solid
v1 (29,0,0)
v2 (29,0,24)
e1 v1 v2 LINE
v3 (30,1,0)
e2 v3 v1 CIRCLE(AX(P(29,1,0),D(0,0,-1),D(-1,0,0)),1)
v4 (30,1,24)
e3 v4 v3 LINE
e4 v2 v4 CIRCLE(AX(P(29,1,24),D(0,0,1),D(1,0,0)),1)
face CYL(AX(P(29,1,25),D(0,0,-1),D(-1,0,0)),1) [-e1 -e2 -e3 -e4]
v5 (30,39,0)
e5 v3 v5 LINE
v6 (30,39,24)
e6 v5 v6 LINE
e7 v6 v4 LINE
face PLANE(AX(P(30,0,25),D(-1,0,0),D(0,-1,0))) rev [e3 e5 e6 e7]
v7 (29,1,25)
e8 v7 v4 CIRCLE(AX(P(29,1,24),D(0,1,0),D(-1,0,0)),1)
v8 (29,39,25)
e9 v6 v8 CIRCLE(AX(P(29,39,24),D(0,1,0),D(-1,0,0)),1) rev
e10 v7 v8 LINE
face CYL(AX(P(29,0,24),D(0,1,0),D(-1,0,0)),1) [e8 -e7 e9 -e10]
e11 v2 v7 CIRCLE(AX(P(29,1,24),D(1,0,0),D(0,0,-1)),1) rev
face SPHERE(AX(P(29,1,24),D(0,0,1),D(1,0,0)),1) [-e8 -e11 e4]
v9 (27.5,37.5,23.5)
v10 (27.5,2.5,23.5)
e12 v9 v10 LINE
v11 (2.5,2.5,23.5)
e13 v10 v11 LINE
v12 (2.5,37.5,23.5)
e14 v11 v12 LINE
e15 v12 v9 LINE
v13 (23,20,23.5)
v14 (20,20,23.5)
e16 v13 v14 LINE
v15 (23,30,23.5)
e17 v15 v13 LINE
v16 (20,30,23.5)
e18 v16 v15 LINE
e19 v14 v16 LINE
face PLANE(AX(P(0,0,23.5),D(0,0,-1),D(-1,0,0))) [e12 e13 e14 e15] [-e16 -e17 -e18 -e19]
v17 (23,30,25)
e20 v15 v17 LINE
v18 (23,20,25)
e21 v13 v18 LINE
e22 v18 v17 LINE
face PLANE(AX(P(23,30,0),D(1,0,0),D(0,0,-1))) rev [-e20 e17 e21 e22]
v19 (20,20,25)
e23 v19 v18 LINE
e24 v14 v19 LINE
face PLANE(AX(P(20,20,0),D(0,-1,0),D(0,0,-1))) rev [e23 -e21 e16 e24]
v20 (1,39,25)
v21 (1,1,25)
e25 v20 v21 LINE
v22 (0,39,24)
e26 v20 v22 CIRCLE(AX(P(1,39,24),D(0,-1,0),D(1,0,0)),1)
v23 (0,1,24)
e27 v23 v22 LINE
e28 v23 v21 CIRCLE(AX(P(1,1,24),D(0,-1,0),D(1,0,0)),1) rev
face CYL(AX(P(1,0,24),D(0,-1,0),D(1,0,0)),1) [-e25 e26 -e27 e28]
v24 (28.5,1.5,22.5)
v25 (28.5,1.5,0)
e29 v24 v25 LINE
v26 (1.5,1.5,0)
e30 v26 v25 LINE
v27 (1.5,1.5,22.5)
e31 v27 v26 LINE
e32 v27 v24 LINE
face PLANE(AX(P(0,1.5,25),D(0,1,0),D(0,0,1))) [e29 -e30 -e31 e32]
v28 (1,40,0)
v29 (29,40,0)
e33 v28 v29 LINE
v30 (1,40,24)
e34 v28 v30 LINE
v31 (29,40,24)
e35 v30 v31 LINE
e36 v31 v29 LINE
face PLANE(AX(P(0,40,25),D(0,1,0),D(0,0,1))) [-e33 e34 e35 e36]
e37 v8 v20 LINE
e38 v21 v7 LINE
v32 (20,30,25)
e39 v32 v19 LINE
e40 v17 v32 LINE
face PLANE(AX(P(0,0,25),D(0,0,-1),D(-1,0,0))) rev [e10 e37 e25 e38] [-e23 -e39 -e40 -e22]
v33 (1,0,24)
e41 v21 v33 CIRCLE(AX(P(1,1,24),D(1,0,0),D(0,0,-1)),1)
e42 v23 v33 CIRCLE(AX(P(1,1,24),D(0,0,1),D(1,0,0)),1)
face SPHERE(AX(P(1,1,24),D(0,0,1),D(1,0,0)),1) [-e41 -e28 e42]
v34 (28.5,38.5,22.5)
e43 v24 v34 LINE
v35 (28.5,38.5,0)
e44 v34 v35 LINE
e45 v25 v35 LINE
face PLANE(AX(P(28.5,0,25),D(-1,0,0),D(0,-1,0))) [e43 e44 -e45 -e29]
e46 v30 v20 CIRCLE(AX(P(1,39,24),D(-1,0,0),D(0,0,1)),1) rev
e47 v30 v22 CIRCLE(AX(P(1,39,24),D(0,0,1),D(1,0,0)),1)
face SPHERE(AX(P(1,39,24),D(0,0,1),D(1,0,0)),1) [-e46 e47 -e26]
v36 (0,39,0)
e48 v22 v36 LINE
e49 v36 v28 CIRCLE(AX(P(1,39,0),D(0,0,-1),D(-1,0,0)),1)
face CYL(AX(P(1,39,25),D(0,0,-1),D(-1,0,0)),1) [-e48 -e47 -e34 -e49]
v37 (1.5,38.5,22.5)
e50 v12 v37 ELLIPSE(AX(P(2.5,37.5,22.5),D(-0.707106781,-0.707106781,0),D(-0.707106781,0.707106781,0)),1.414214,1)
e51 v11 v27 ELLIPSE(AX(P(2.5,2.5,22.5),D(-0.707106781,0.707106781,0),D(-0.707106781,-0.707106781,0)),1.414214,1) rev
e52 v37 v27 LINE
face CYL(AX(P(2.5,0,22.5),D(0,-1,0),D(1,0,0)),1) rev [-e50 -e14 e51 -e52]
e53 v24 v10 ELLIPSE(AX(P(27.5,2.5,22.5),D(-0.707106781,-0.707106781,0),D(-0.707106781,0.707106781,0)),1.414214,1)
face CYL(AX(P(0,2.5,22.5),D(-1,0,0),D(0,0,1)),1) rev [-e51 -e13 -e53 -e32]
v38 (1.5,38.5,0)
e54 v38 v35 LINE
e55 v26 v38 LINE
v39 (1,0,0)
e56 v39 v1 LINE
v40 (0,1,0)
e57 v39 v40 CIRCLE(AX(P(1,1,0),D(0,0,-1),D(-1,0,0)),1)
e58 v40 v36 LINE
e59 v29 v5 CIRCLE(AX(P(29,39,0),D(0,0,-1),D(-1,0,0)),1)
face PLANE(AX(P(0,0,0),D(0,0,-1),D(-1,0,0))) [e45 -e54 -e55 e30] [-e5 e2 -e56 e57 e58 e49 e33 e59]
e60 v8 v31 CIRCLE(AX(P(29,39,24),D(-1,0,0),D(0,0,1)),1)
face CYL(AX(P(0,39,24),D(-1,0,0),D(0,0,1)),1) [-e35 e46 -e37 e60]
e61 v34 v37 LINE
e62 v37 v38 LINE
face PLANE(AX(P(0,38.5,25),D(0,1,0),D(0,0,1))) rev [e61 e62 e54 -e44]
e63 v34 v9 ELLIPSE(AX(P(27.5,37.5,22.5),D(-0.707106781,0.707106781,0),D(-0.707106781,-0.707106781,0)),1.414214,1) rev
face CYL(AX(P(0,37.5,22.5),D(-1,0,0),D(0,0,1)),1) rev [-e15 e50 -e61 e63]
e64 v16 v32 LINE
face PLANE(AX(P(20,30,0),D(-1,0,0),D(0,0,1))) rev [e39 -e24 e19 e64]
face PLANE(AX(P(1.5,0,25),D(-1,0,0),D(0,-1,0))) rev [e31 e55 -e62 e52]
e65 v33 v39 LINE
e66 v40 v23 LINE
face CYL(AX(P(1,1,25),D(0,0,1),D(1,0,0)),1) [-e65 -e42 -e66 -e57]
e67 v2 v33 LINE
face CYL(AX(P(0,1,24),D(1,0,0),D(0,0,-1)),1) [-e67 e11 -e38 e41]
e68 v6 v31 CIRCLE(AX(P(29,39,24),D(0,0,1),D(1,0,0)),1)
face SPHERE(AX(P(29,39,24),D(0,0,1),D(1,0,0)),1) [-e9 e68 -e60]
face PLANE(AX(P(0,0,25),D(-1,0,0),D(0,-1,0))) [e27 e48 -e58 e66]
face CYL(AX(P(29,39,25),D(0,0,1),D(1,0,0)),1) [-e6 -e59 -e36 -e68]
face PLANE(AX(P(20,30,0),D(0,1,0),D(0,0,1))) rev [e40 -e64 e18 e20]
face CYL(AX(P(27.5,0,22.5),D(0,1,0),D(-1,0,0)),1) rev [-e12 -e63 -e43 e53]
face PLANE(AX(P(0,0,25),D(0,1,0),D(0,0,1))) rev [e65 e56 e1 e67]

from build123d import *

# Parameters (mm, degrees)
SKETCH2_W           = 30
SKETCH2_H           = 40
BOSS_EXTRUDE2_DEPTH = 25
FILLET2_R           = 1
FILLET3_R           = 1
SHELL1_START        = 1.5
SHELL1_OUTLINE_W    = 37
SHELL1_OUTLINE_H    = 23.5
SHELL1_DEPTH        = 27
FILLET4_R           = 1
SKETCH5_W           = 3
SKETCH5_H           = 10
CUT_EXTRUDE1_DEPTH  = 56.901699437


# Read off the part's stored shape, not the designer's step: Shell1
with BuildPart() as part:
    # Sketch2 → Boss-Extrude2 (new body)
    with BuildSketch(Plane.XY):
        with Locations((15, 20)):
            Rectangle(SKETCH2_W, SKETCH2_H)
    extrude(amount=BOSS_EXTRUDE2_DEPTH)

    # Fillet2
    fillet2_edges = [part.edges().sort_by_distance(p)[0] for p in [
        (30, 20, 25),
        (15, 0, 25),
        (0, 20, 25),
        (15, 40, 25),
    ]]
    fillet(fillet2_edges, radius=FILLET2_R)

    # Fillet3
    # the kernel refuses this fillet: 1 mm, written as the material it takes off along each edge
    with BuildSketch(Plane(origin=(1, 39, 24), x_dir=(0, 1, 0), z_dir=(-1, 0, 0))) as fillet3_piece_1_section:
        Polygon((0, 0), (FILLET3_R, 0), (FILLET3_R, -FILLET3_R), (0, -FILLET3_R), align=None)
    fillet3_piece_1 = extrude(amount=FILLET3_R, mode=Mode.PRIVATE)
    fillet3_piece_1 = fillet3_piece_1 - Plane(origin=(1, 39, 24), x_dir=(0, -0.7071067811865475, -0.7071067811865475), z_dir=(-1, 0, 0)) * Sphere(FILLET3_R, mode=Mode.PRIVATE)
    add(fillet3_piece_1, mode=Mode.SUBTRACT)
    with BuildSketch(Plane(origin=(29, 39, 24), x_dir=(0, 1, 0), z_dir=(1, 0, 0))) as fillet3_piece_2_section:
        Polygon((0, 0), (FILLET3_R, 0), (FILLET3_R, FILLET3_R), (0, FILLET3_R), align=None)
    fillet3_piece_2 = extrude(amount=FILLET3_R, mode=Mode.PRIVATE)
    fillet3_piece_2 = fillet3_piece_2 - Plane(origin=(29, 39, 24), x_dir=(0, -0.7071067811865475, -0.7071067811865475), z_dir=(1, 0, 0)) * Sphere(FILLET3_R, mode=Mode.PRIVATE)
    add(fillet3_piece_2, mode=Mode.SUBTRACT)
    with BuildSketch(Plane(origin=(1, 1, 24), x_dir=(-1, 0, 0), z_dir=(0, -1, 0))) as fillet3_piece_3_section:
        Polygon((0, 0), (FILLET3_R, 0), (FILLET3_R, -FILLET3_R), (0, -FILLET3_R), align=None)
    fillet3_piece_3 = extrude(amount=FILLET3_R, mode=Mode.PRIVATE)
    fillet3_piece_3 = fillet3_piece_3 - Plane(origin=(1, 1, 24), x_dir=(0.7071067811865475, 0, -0.7071067811865475), z_dir=(0, -1, 0)) * Sphere(FILLET3_R, mode=Mode.PRIVATE)
    add(fillet3_piece_3, mode=Mode.SUBTRACT)
    with BuildSketch(Plane(origin=(29, 1, 24), x_dir=(1, 0, 0), z_dir=(0, -1, 0))) as fillet3_piece_4_section:
        Polygon((0, 0), (FILLET3_R, 0), (FILLET3_R, FILLET3_R), (0, FILLET3_R), align=None)
    fillet3_piece_4 = extrude(amount=FILLET3_R, mode=Mode.PRIVATE)
    fillet3_piece_4 = fillet3_piece_4 - Plane(origin=(29, 1, 24), x_dir=(-0.7071067811865475, 0, -0.7071067811865475), z_dir=(0, -1, 0)) * Sphere(FILLET3_R, mode=Mode.PRIVATE)
    add(fillet3_piece_4, mode=Mode.SUBTRACT)
    with BuildSketch(Plane(origin=(30, 0, -2.5), x_dir=(-1, 0, 0), z_dir=(0, 0, 1)), Plane(origin=(30, 40, -2.5), x_dir=(0, -1, 0), z_dir=(0, 0, 1))) as fillet3_piece_5:
        with BuildLine():
            CenterArc((FILLET3_R, -FILLET3_R), FILLET3_R, 90, 90)
            Line((0, -FILLET3_R), (0, 0))
            Line((0, 0), (FILLET3_R, 0))
        make_face()
    extrude(amount=26.5, mode=Mode.SUBTRACT)
    with BuildSketch(Plane(origin=(0, 0, -2.5), x_dir=(1, 0, 0), z_dir=(0, 0, 1)), Plane(origin=(0, 40, -2.5), x_dir=(0, -1, 0), z_dir=(0, 0, 1))) as fillet3_piece_6:
        with BuildLine():
            CenterArc((FILLET3_R, FILLET3_R), FILLET3_R, 180, 90)
            Line((0, FILLET3_R), (0, 0))
            Line((0, 0), (FILLET3_R, 0))
        make_face()
    extrude(amount=26.5, mode=Mode.SUBTRACT)

    # Shell1 outline → Shell1 (cut)
    with BuildSketch(Plane.YZ.offset(SHELL1_START)):
        with Locations((20, 11.75)):
            Rectangle(SHELL1_OUTLINE_W, SHELL1_OUTLINE_H)
    extrude(amount=SHELL1_DEPTH, mode=Mode.SUBTRACT)

    # Fillet4
    fillet4_edges = [part.edges().sort_by_distance(p)[0] for p in [
        (28.5, 20, 23.5),
        (1.5, 20, 23.5),
        (15, 1.5, 23.5),
        (15, 38.5, 23.5),
    ]]
    fillet(fillet4_edges, radius=FILLET4_R)

    # Sketch5 → Cut-Extrude1 (cut, through all)
    with BuildSketch(Plane.XY.offset(25)):
        with Locations((21.5, 25)):
            Rectangle(SKETCH5_W, SKETCH5_H)
    extrude(amount=-CUT_EXTRUDE1_DEPTH, mode=Mode.SUBTRACT)


solid = part.part
